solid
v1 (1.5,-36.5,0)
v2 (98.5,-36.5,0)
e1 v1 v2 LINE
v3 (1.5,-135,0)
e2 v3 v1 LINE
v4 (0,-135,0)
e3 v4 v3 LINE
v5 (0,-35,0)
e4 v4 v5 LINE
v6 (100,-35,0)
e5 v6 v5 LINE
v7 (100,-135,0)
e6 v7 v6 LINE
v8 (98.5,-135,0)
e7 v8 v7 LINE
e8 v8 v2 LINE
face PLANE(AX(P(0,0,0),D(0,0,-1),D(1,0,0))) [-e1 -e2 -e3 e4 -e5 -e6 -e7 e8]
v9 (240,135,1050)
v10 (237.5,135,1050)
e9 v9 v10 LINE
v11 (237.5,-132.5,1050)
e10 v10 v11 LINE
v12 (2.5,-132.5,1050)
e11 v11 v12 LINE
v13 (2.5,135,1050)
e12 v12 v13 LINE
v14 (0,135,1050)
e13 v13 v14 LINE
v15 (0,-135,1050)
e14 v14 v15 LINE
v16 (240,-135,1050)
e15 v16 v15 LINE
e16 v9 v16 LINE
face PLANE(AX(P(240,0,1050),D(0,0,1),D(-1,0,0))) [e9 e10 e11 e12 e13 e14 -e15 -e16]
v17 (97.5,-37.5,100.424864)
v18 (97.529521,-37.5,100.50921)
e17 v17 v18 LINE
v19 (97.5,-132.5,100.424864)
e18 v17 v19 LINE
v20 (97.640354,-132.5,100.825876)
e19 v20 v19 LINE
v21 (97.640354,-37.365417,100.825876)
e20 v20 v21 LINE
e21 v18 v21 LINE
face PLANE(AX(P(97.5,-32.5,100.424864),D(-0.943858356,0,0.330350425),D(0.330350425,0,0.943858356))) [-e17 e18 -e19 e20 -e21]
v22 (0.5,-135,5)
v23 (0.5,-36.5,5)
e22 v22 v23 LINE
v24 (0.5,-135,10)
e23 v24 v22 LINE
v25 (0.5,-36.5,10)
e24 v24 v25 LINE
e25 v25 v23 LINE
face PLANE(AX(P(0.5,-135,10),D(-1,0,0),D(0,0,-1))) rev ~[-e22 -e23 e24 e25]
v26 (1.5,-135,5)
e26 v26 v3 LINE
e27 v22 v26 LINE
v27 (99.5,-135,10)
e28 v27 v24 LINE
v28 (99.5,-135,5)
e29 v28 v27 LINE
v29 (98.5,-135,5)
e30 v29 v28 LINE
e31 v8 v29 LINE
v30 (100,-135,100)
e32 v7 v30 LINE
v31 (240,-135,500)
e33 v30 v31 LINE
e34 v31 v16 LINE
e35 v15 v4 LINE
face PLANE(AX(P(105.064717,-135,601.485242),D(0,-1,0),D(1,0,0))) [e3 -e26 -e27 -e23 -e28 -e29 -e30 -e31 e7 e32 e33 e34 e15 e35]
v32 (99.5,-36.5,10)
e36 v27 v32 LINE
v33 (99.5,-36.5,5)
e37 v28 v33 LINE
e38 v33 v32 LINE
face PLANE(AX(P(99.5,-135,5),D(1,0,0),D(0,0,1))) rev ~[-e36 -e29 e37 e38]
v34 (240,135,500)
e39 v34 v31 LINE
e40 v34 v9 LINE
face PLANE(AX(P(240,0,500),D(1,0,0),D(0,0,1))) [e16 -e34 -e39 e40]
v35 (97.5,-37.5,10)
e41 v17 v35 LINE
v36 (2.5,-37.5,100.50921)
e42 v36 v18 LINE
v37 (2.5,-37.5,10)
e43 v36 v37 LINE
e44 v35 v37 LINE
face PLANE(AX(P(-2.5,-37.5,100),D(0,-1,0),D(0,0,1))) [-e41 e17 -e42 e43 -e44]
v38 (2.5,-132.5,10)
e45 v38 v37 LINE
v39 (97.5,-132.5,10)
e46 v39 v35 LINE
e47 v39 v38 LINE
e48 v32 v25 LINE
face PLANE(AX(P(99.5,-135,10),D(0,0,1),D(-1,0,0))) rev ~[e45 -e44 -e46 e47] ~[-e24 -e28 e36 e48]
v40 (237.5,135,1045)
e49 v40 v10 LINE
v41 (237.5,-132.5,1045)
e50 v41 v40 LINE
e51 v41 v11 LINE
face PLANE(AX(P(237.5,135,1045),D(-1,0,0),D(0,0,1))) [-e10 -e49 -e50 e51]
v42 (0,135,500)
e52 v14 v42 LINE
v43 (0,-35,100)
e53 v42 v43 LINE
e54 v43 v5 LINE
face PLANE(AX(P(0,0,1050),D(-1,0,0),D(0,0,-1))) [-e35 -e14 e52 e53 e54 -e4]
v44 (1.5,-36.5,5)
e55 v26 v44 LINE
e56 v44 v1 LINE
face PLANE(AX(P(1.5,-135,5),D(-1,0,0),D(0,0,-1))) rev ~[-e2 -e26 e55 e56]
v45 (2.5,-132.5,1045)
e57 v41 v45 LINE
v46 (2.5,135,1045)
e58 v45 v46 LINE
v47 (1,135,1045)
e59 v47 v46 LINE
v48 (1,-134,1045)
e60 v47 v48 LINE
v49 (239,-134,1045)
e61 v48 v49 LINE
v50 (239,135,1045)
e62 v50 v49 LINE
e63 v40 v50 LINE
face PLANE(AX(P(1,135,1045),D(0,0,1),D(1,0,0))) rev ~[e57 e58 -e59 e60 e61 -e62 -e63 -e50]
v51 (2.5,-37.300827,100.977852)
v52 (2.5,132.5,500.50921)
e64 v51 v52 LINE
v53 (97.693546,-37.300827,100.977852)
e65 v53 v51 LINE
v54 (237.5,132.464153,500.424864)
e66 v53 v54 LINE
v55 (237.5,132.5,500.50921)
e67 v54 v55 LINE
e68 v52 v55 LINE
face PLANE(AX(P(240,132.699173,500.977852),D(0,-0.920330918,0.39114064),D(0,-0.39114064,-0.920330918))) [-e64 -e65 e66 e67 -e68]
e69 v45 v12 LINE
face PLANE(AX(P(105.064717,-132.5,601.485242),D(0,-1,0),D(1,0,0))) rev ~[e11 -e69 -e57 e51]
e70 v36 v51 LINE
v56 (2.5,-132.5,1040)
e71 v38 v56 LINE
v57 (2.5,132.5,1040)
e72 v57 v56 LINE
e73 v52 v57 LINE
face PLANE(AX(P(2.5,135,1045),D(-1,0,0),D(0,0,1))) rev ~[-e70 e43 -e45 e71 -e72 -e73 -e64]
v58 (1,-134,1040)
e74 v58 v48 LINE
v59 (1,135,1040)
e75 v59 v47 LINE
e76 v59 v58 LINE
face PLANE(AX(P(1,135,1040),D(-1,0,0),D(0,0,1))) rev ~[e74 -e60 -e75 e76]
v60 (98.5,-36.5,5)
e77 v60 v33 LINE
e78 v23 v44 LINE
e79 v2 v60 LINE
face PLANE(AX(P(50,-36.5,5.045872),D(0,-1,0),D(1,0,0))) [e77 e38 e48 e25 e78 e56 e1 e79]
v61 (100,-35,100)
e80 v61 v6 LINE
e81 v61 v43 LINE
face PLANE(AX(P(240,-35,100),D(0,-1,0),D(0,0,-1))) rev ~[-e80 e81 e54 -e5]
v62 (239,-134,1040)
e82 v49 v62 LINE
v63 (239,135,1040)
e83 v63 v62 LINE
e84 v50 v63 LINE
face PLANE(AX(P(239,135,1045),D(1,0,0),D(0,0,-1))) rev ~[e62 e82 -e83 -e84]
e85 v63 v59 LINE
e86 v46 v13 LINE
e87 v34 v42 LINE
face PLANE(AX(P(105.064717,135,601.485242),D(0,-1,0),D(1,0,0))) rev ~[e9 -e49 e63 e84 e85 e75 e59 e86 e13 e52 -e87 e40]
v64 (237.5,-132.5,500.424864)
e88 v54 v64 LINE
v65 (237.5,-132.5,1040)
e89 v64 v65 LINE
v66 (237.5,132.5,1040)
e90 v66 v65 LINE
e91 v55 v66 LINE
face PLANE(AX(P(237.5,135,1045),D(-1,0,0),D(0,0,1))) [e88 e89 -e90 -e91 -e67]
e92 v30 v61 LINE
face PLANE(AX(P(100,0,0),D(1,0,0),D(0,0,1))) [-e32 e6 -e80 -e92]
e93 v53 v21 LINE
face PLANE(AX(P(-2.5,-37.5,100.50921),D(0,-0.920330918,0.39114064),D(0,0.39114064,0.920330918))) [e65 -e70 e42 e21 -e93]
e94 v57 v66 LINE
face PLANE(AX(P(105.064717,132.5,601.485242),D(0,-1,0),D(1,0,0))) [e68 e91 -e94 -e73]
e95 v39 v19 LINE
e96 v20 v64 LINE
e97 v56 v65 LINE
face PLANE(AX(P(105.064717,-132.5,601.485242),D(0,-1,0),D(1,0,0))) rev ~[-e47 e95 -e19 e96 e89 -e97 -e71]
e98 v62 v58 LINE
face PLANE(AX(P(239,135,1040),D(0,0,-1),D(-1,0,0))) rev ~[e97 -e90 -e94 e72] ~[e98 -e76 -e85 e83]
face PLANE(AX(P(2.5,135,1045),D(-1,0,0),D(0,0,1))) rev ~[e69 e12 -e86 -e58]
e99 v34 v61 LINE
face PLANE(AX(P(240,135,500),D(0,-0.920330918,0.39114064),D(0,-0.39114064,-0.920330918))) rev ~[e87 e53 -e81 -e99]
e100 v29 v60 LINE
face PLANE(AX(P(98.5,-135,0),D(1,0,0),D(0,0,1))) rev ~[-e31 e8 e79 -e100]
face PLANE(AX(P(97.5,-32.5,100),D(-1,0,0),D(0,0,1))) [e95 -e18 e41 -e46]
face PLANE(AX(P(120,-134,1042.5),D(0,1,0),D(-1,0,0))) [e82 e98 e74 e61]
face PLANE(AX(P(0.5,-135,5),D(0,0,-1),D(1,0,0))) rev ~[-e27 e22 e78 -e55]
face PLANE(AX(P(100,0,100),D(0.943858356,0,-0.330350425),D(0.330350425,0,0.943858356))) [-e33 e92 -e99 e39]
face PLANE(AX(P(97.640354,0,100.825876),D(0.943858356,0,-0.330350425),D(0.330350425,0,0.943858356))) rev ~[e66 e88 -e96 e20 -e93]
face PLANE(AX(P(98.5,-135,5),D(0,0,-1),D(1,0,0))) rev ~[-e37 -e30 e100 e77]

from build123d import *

# Parameters (mm, degrees)
F0_W        = 100
F0_H        = 100
F1_DEPTH    = 135
F3_DEPTH    = 240
F4_T        = 2.5
F4_T3_DEPTH = 105
F4_T5_DEPTH = 105
F6_DEPTH    = 98.5
F7_W        = 235
F7_H        = 5
F8_DEPTH    = 2.5
F9_DEPTH    = 269


# Not quite as in the source:
# - a shell that OpenCascade refuses in one call is made with other operations: the cavity is built on its own and cut out


with BuildPart() as f1:
    # F0 (on Front) → F1 (new body, symmetric)
    with BuildSketch(Plane.XZ):
        Polygon((0, 500), (0, 100), (100, 100), (240, 500), (240, 1050), (0, 1050), align=None)
        with Locations((50, 50)):
            Rectangle(F0_W, F0_H)
    extrude(amount=F1_DEPTH, both=True)

    # F2 (on face) → F3 (cut)
    with BuildSketch(Plane.YZ.offset(240)):
        Polygon((135, 0), (135, 500), (-35, 100), (-35, 0), align=None)
    extrude(amount=-F3_DEPTH, mode=Mode.SUBTRACT)

    # F4: shell of thickness 2.5, made by hand


with BuildPart() as f4_core1:
    # F4_t2: copy of F1
    add(f1.part)

    # the walls: a layer under each face that stays
    f4_faces = [f4_core1.faces().sort_by_distance(p)[0] for p in [
        (0, 0, 525),
        (120, -135, 525),
        (100, -85, 50),
        (50, -35, 50),
        (120, 50, 300),
        (120, 135, 775),
        (170, 0, 300),
        (240, 0, 775),
    ]]
    thicken(f4_faces, amount=-F4_T, mode=Mode.SUBTRACT)

    # F4_s4 → F4_t3 (cut)
    with BuildSketch(Plane.XZ.offset(32.5)):
        Polygon((100.0485964589, 99.9917412394), (97.5, 100), (97.5, 100.4248643216), (97.6403541091, 100.8258760618), align=None)
    extrude(amount=F4_T3_DEPTH, mode=Mode.SUBTRACT)

    # F4_s6 → F4_t5 (cut)
    with BuildSketch(Plane.YZ.offset(-2.5)):
        Polygon((-34.951991727, 99.990221484), (-37.5, 100), (-37.5, 100.5092099447), (-37.3008272961, 100.9778516009), align=None)
    extrude(amount=F4_T5_DEPTH, mode=Mode.SUBTRACT)


with BuildPart() as f1_1:
    add(f1.part)

    # what is left inside the walls is the cavity
    f4_cavity = [f4_core1.part.solids().sort_by_distance(p)[0] for p in [
        (2.525, 44.166667, 525),
    ]]
    add(f4_cavity, mode=Mode.SUBTRACT)

    # F5 (on face) → F6 (cut)
    with BuildSketch(Plane.XZ.offset(135)):
        Polygon((1.5, 5), (1.5, 0), (98.5, 0), (98.5, 5), (99.5, 5), (99.5, 10), (0.5, 10), (0.5, 5), align=None)
    extrude(amount=-F6_DEPTH, mode=Mode.SUBTRACT)

    # F7 (on face) → F8 (cut)
    with BuildSketch(Plane(origin=(0, 135, 0), x_dir=(-1, 0, 0), z_dir=(0, 1, 0))):
        with Locations((-120, 1047.5)):
            Rectangle(F7_W, F7_H)
    extrude(amount=-F8_DEPTH, mode=Mode.SUBTRACT)

    # F7 (on face) → F9 (cut)
    with BuildSketch(Plane(origin=(0, 135, 0), x_dir=(-1, 0, 0), z_dir=(0, 1, 0))):
        Polygon((-2.5, 1045), (-237.5, 1045), (-239, 1045), (-239, 1040), (-1, 1040), (-1, 1045), align=None)
    extrude(amount=-F9_DEPTH, mode=Mode.SUBTRACT)


solid = f1_1.part
